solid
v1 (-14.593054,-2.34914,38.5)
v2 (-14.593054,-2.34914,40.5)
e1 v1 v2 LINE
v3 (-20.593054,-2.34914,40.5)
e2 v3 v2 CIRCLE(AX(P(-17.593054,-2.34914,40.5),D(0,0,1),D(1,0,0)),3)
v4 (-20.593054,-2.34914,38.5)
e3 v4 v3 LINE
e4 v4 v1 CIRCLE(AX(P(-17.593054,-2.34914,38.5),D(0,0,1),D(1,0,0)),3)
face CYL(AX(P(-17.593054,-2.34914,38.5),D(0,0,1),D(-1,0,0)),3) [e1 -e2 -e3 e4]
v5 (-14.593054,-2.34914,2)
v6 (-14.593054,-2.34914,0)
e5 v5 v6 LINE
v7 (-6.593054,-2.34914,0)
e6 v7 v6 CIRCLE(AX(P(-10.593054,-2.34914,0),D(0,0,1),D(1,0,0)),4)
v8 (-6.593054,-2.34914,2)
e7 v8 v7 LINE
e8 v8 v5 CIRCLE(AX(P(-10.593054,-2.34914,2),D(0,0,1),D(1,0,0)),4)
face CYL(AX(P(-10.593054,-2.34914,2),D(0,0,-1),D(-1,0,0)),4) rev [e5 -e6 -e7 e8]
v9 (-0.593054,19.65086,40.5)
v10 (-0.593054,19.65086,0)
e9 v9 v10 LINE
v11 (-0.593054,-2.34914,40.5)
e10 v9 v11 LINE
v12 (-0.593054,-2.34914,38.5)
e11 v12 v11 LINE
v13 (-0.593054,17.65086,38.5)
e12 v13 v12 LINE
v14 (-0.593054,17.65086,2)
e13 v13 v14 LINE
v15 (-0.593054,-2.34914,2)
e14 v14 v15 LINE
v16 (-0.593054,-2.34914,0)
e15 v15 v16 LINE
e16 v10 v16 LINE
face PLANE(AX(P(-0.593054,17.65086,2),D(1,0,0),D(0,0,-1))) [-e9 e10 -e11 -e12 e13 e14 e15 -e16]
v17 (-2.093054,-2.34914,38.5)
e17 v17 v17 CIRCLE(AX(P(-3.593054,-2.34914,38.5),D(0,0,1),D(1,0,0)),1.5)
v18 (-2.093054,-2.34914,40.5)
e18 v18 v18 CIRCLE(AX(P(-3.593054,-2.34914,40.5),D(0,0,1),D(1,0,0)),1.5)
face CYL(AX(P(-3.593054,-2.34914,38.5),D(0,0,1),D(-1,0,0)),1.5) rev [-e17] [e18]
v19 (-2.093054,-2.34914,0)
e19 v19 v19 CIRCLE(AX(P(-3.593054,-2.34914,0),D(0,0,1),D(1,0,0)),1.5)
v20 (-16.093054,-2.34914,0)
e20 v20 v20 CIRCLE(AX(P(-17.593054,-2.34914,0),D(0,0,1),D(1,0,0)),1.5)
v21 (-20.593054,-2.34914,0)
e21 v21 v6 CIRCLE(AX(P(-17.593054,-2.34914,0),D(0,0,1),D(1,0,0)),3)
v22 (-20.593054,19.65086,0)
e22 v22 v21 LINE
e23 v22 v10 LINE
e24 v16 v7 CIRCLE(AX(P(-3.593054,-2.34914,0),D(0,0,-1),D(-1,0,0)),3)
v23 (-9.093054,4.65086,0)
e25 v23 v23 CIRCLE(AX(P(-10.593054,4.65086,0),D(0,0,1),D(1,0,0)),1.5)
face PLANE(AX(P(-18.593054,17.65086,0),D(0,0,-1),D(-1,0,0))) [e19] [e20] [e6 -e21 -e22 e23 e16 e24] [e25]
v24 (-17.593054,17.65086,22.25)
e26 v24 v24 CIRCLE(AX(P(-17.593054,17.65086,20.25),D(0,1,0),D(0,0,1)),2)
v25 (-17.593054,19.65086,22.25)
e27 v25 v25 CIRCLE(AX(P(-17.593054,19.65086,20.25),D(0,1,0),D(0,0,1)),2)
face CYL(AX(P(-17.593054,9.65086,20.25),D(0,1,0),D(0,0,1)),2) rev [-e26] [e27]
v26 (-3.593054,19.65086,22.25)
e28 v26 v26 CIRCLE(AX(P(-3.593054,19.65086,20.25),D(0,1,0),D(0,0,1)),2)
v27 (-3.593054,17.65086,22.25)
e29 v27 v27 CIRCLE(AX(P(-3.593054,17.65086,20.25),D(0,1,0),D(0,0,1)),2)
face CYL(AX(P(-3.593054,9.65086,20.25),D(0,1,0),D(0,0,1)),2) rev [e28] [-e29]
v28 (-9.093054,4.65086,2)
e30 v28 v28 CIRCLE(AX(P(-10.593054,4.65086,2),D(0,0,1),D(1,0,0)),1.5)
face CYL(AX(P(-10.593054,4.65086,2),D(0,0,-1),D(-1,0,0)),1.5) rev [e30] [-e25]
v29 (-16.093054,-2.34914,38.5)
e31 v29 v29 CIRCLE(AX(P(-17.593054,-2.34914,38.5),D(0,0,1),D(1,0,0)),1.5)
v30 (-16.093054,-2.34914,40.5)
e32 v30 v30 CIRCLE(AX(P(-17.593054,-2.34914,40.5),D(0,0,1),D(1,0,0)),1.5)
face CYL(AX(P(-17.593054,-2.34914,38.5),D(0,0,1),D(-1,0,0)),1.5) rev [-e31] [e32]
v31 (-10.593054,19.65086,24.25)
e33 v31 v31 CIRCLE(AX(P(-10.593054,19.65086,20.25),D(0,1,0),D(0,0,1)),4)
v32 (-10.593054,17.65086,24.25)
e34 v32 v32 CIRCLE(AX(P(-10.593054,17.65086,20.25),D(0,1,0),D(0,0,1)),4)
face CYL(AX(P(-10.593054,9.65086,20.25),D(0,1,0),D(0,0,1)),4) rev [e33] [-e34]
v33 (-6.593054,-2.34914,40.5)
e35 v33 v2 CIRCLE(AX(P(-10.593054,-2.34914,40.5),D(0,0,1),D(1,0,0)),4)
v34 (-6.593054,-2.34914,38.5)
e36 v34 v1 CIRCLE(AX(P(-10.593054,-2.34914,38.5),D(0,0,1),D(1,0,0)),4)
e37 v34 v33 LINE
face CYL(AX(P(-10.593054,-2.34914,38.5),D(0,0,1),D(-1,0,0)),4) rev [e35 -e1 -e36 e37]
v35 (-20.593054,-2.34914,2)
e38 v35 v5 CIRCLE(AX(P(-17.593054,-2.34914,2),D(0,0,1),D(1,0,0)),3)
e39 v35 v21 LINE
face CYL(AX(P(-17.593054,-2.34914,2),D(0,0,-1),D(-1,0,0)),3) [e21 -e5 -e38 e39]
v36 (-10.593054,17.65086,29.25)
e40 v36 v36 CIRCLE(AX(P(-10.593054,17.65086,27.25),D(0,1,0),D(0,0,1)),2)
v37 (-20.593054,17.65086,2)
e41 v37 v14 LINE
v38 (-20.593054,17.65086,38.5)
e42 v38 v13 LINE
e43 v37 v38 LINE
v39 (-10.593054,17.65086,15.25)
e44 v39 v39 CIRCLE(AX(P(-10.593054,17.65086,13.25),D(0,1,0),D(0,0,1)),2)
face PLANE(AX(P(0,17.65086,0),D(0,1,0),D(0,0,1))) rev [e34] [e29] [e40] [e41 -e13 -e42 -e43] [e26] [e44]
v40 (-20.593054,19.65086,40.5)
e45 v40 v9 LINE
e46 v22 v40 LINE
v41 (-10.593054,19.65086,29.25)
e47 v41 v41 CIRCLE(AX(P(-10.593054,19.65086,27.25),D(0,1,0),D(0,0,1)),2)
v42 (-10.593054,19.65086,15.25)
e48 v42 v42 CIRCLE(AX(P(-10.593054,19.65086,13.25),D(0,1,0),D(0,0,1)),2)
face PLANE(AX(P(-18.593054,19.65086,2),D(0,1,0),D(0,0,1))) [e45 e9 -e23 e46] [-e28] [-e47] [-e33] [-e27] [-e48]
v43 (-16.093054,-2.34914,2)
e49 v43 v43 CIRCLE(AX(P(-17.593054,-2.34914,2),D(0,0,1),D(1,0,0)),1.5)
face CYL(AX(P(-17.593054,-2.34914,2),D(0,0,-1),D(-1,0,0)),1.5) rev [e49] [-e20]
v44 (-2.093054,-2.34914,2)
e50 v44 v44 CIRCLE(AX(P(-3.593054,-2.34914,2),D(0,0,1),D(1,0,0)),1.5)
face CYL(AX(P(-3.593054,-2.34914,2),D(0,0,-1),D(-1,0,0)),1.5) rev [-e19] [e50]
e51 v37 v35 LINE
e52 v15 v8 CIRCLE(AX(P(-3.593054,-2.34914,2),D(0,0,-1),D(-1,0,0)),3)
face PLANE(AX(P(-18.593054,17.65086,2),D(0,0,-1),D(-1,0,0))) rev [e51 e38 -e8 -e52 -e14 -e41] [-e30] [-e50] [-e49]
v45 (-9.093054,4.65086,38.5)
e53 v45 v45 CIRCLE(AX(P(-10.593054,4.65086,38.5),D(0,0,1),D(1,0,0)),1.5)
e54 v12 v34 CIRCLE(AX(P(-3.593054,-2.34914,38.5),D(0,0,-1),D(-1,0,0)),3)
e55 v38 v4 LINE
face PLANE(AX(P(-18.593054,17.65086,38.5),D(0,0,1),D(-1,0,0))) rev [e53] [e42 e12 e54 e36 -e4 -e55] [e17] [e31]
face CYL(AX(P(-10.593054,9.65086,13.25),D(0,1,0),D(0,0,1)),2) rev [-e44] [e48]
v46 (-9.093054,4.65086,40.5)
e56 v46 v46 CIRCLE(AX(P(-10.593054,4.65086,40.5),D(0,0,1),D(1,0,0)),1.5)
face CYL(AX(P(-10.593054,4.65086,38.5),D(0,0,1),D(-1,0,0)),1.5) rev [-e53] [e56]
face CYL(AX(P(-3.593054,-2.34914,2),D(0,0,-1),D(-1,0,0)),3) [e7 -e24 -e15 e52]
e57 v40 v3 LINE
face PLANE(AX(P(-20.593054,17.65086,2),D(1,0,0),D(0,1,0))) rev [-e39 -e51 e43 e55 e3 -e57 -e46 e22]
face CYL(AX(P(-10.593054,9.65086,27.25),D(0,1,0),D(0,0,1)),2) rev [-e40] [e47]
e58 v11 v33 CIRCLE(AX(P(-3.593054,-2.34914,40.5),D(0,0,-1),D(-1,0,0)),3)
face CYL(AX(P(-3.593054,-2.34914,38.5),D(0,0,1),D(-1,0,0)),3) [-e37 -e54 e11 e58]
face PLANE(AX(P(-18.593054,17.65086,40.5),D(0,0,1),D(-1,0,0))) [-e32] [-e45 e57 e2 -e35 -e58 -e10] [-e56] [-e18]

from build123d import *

# Parameters (mm, degrees)
CROQUIS1_R              = 1.5
SALIENTE_EXTRUIR3_DEPTH = 2
CROQUIS7_W              = 20
CROQUIS7_H              = 20.25
SALIENTE_EXTRUIR4_DEPTH = 2
CROQUIS15_R             = 2
CROQUIS15_R_2           = 4
CORTAR_EXTRUIR1_DEPTH   = 10


with BuildPart() as part:
    # Croquis1 → Saliente-Extruir3 (new body)
    with BuildSketch(Plane.XY.offset(325.976420163)):
        with BuildLine():
            Line((-20.593054102, 17.650860191), (-20.593054102, -2.349139809))
            ThreePointArc((-20.593054102, -2.349139809), (-17.593054102, -5.349139809), (-14.593054102, -2.349139809))
            ThreePointArc((-14.593054102, -2.349139809), (-10.593054102, 1.650860191), (-6.593054102, -2.349139809))
            ThreePointArc((-6.593054102, -2.349139809), (-3.593054102, -5.349139809), (-0.593054102, -2.349139809))
            Line((-0.593054102, -2.349139809), (-0.593054102, 17.650860191))
            ThreePointArc((-0.593054102, 17.650860191), (-1.17884054, 19.065073753), (-2.593054102, 19.650860191))
            Line((-2.593054102, 19.650860191), (-18.593054102, 19.650860191))
            ThreePointArc((-18.593054102, 19.650860191), (-20.007267664, 19.065073753), (-20.593054102, 17.650860191))
        make_face()
        with Locations((-17.593054102, -2.349139809)):
            Circle(CROQUIS1_R, mode=Mode.SUBTRACT)
        with Locations((-10.593054102, 4.650860191)):
            Circle(CROQUIS1_R, mode=Mode.SUBTRACT)
        with Locations((-3.593054102, -2.349139809)):
            Circle(CROQUIS1_R, mode=Mode.SUBTRACT)
    extrude(amount=SALIENTE_EXTRUIR3_DEPTH)


with BuildPart() as part_1:
    # Sólido-Mover/Copiar1: read off the stored shape, not the designer's step
    # Sólido-Mover/Copiar1: moved
    add(part.part.moved(Location((0, 0, -325.9764202))))

    # Croquis7 → Saliente-Extruir4 (add)
    with BuildSketch(Plane(origin=(0, 19.650860191, 0), x_dir=(-1, 0, 0), z_dir=(0, 1, 0))):
        with Locations((10.593054102, 10.125)):
            Rectangle(CROQUIS7_W, CROQUIS7_H)
    extrude(amount=-SALIENTE_EXTRUIR4_DEPTH)

    # Simetría5: part across plane


with BuildPart() as part_2:
    add(part_1.part)
    add(part_1.part.mirror(Plane(origin=(-0.593054102, 17.650860191, 20.25), x_dir=(1, 0, 0), z_dir=(0, 0, 1))))

    # Croquis15 → Cortar-Extruir1 (cut)
    with BuildSketch(Plane(origin=(0, 19.650860191, 0), x_dir=(-1, 0, 0), z_dir=(0, 1, 0))):
        with Locations(Location((10.593054102, 27.25, 0), (0, 0, 90))):
            Circle(CROQUIS15_R)
        with Locations(Location((17.593054102, 20.25, 0), (0, 0, 90))):
            Circle(CROQUIS15_R)
        with Locations(Location((10.593054102, 13.25, 0), (0, 0, 90))):
            Circle(CROQUIS15_R)
        with Locations(Location((3.593054102, 20.25, 0), (0, 0, 90))):
            Circle(CROQUIS15_R)
        with Locations(Location((10.593054102, 20.25, 0), (0, 0, 90))):
            Circle(CROQUIS15_R_2)
    extrude(amount=-CORTAR_EXTRUIR1_DEPTH, mode=Mode.SUBTRACT)


solid = part_2.part
